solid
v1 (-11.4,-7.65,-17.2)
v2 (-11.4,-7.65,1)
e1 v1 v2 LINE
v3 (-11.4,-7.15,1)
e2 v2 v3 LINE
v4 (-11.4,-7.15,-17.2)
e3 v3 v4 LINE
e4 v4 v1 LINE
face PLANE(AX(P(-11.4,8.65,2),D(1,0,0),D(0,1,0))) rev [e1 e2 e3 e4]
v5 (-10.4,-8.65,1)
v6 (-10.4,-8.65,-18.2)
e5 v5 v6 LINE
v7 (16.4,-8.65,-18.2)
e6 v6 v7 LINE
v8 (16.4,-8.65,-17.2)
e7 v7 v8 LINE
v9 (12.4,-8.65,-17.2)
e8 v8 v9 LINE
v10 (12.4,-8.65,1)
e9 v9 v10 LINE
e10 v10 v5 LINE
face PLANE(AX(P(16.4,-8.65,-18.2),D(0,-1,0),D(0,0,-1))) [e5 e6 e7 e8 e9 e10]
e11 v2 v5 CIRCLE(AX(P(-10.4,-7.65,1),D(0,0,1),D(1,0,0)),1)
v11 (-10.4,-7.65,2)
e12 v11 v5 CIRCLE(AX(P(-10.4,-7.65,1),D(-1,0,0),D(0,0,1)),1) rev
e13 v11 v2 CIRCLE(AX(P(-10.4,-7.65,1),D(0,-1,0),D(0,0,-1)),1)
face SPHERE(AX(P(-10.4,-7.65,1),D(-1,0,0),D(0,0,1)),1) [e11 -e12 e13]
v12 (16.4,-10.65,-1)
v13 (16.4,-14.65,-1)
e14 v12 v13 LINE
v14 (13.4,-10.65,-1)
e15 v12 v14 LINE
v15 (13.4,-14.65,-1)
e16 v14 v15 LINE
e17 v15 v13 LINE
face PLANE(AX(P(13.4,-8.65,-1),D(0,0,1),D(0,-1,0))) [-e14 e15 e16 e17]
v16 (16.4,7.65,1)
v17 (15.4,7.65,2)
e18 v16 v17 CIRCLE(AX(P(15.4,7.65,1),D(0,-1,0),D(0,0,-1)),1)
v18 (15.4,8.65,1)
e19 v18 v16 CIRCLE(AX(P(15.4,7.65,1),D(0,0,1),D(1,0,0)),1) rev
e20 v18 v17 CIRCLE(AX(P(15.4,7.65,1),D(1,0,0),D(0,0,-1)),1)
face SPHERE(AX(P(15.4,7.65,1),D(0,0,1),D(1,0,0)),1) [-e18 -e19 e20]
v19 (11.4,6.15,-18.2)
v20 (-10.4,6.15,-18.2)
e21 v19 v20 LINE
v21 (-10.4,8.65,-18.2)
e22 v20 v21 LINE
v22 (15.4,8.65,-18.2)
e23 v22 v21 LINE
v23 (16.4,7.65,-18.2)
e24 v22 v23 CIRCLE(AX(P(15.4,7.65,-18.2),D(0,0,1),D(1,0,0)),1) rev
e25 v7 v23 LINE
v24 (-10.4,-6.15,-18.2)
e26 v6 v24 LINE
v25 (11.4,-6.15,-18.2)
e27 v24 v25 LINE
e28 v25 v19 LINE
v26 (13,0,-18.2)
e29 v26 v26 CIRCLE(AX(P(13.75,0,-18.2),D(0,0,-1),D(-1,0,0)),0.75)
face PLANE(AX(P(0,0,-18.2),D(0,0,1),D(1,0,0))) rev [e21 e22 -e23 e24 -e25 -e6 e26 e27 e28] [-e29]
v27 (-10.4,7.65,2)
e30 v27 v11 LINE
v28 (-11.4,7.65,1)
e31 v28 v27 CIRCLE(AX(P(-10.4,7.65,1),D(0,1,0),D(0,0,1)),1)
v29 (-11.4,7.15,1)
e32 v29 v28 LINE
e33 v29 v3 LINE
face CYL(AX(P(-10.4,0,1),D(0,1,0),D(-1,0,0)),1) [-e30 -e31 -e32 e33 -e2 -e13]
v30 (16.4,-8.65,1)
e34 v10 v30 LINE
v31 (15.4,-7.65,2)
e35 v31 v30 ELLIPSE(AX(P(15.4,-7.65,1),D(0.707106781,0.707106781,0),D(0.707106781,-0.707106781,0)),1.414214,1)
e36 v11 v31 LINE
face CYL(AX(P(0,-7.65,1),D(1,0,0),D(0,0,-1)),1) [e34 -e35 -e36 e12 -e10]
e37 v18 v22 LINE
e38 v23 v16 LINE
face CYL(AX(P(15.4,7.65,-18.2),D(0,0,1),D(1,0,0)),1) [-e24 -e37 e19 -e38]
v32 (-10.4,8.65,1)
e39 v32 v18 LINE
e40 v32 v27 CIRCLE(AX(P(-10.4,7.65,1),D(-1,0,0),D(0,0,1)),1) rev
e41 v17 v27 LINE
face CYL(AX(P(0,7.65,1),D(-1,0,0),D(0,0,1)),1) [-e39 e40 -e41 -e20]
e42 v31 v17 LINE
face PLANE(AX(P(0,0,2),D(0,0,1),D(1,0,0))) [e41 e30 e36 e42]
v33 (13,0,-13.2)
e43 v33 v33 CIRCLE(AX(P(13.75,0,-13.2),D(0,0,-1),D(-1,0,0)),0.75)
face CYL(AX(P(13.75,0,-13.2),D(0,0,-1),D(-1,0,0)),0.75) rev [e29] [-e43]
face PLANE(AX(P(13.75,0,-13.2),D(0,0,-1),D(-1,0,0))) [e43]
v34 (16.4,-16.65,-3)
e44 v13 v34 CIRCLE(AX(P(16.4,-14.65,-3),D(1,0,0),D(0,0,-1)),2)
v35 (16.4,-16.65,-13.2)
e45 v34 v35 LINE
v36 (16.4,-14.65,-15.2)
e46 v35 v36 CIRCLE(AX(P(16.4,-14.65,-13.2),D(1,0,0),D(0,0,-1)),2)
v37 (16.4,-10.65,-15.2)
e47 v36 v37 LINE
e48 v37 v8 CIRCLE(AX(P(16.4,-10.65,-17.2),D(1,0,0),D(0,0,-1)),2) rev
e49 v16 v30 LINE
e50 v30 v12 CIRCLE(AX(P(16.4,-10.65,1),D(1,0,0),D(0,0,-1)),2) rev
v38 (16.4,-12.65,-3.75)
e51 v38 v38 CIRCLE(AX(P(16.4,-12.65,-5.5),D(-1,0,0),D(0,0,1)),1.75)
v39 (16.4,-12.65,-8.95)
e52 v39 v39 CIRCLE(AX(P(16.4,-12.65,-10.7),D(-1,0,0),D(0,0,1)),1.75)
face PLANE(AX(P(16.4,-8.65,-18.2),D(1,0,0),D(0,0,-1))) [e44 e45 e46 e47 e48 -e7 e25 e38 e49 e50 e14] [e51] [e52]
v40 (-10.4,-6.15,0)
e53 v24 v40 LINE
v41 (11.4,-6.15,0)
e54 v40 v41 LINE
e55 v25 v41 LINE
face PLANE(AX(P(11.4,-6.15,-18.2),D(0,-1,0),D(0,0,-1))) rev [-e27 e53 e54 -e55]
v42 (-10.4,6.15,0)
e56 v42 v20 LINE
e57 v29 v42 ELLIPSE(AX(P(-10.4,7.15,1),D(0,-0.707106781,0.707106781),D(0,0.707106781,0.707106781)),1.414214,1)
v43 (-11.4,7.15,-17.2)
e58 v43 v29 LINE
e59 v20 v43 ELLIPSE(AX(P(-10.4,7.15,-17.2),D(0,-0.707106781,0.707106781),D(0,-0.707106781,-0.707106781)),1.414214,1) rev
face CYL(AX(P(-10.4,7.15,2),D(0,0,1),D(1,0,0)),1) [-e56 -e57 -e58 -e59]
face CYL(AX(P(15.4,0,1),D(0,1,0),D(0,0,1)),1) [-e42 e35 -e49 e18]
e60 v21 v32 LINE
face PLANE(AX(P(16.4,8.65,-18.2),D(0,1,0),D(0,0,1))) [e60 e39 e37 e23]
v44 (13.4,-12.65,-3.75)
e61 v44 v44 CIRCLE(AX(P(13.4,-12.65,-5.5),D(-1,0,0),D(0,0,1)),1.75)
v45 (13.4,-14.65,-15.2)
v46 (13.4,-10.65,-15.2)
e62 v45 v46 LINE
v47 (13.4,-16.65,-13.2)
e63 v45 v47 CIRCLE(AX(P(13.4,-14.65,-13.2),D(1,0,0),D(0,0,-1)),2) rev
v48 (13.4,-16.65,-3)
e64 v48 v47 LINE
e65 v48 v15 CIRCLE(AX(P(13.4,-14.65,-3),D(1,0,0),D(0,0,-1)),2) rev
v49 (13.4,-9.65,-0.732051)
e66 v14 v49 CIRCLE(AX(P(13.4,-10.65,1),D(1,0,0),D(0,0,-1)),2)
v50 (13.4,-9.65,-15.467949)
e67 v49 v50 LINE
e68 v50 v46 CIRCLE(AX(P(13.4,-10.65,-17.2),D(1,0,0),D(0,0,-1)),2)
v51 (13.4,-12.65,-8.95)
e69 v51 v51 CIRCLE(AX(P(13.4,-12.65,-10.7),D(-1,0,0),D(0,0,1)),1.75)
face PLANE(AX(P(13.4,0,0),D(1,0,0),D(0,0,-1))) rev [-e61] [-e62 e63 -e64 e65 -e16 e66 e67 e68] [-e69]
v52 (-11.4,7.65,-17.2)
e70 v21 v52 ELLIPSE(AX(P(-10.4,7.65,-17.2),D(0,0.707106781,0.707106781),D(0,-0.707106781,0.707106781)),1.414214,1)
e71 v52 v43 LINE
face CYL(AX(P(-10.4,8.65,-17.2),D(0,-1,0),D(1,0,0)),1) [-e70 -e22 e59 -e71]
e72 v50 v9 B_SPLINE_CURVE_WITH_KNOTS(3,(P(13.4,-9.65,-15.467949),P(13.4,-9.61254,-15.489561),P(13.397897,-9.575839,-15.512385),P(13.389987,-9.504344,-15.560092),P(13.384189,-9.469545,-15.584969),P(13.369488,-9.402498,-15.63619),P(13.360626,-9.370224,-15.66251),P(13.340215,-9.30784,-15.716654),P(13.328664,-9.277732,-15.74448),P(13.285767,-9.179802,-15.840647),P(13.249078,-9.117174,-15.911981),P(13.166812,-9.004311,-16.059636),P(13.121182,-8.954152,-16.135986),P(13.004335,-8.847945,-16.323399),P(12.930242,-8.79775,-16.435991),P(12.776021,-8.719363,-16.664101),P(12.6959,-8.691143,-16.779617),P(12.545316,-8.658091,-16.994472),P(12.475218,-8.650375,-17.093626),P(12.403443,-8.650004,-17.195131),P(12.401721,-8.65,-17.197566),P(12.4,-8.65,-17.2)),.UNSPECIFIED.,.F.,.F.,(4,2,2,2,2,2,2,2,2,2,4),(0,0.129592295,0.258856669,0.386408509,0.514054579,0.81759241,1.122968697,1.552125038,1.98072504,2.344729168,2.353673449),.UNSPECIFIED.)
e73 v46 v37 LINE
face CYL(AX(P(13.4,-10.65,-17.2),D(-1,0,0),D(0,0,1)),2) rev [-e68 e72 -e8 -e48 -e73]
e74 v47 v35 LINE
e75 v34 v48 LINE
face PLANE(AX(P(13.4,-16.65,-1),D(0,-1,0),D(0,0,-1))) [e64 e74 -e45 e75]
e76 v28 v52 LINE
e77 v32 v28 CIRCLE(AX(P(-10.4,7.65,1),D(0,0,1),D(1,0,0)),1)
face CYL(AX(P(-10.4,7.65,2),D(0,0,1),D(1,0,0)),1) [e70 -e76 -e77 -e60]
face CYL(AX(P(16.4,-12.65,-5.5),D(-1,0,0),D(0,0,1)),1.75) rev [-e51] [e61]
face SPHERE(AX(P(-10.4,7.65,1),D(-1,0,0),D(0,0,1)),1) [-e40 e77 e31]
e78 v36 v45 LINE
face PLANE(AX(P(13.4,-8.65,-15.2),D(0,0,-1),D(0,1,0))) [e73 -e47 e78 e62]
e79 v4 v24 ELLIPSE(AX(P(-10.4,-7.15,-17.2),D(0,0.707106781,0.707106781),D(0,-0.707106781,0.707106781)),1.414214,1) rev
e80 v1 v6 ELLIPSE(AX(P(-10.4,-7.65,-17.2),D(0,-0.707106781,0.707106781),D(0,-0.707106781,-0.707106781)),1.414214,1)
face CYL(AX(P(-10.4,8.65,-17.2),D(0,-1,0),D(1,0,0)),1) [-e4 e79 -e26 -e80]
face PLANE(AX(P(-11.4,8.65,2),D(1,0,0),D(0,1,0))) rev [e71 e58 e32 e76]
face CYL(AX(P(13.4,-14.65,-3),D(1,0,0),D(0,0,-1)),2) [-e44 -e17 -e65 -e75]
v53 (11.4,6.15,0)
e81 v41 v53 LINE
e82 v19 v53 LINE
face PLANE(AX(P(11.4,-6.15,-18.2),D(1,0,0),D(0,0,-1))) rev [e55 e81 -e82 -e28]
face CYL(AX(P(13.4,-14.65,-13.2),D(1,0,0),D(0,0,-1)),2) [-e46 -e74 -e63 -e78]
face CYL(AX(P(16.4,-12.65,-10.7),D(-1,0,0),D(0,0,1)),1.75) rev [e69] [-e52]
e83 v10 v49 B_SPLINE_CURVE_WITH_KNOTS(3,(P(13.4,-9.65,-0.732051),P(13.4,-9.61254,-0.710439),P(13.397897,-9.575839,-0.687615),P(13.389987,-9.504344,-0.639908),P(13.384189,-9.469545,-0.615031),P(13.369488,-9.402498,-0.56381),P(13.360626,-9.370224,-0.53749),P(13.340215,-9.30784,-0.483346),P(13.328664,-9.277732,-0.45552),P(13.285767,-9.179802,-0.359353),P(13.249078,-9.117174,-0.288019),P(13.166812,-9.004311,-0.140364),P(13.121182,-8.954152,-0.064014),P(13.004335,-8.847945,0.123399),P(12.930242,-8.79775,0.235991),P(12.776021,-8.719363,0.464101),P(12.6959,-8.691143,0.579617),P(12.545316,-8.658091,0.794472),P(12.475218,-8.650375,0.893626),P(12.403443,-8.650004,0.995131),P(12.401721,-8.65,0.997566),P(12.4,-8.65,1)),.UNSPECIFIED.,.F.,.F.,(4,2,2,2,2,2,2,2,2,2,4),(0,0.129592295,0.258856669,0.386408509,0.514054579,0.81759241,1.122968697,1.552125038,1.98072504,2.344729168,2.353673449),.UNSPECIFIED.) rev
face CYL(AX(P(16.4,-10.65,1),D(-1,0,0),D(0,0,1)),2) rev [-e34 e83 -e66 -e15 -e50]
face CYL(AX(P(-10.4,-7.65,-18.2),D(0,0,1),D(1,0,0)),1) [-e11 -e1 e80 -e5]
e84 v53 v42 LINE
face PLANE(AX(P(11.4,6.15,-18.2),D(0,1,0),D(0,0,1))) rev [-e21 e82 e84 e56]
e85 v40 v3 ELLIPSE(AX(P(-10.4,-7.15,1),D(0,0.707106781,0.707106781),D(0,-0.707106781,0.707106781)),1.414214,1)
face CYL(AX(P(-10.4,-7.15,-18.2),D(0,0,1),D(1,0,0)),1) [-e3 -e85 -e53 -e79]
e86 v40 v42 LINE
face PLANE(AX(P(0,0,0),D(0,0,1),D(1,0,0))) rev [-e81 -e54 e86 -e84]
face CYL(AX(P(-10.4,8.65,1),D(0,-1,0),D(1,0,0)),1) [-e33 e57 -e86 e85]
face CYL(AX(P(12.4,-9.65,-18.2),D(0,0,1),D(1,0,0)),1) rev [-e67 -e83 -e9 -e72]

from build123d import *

# Parameters (mm, degrees)
SKETCH1_W           = 22.8
SKETCH1_H           = 12.3
BOSS_EXTRUDE1_DEPTH = 2
SKETCH2_W           = 32.8
SKETCH2_H           = 17.3
SKETCH2_W_2         = 22.8
SKETCH2_H_2         = 12.3
BOSS_EXTRUDE2_DEPTH = 20.2
SKETCH3_W           = 15.2
SKETCH3_H           = 11.3
CUT_EXTRUDE1_DEPTH  = 5
FILLET1_R           = 1
SKETCH4_R           = 0.75
CUT_EXTRUDE2_DEPTH  = 5
SKETCH5_W           = 3.5
SKETCH5_H           = 17.3
CUT_EXTRUDE3_DEPTH  = 28.419381831
FILLET2_R           = 1
SKETCH8_W           = 14.2
SKETCH8_H           = 8
BOSS_EXTRUDE4_DEPTH = 3
SKETCH9_R           = 1.75
CUT_EXTRUDE5_DEPTH  = 37.057627487
FILLET4_R           = 2
SKETCH10_W          = 2.29579642
SKETCH10_H          = 17.3
CUT_EXTRUDE6_DEPTH  = 31.890492065
FILLET5_R           = 1
FILLET6_R           = 1


with BuildPart() as part:
    # Sketch1 → Boss-Extrude1 (new body)
    with BuildSketch(Plane.XY):
        Rectangle(SKETCH1_W, SKETCH1_H)
    extrude(amount=BOSS_EXTRUDE1_DEPTH)

    # Sketch2 → Boss-Extrude2 (add)
    with BuildSketch(Plane.XY.offset(2)):
        Rectangle(SKETCH2_W, SKETCH2_H)
        Rectangle(SKETCH2_W_2, SKETCH2_H_2, mode=Mode.SUBTRACT)
    extrude(amount=-BOSS_EXTRUDE2_DEPTH)

    # Sketch3 → Cut-Extrude1 (cut)
    with BuildSketch(Plane.ZY.offset(16.4)):
        with Locations((-10.6, 0)):
            Rectangle(SKETCH3_W, SKETCH3_H)
    extrude(amount=-CUT_EXTRUDE1_DEPTH, mode=Mode.SUBTRACT)

    # Fillet1
    fillet1_edges = [part.edges().sort_by_distance(p)[0] for p in [
        (-13.9, 5.65, -3),
        (-13.9, -5.65, -3),
    ]]
    fillet(fillet1_edges, radius=FILLET1_R)

    # Sketch4 → Cut-Extrude2 (cut)
    with BuildSketch(Plane(origin=(0, 0, -18.2), x_dir=(-1, 0, 0), z_dir=(0, 0, -1))):
        with Locations((-13.75, 0)):
            Circle(SKETCH4_R)
    extrude(amount=-CUT_EXTRUDE2_DEPTH, mode=Mode.SUBTRACT)

    # Sketch5 → Cut-Extrude3 (cut, through all)
    with BuildSketch(Plane(origin=(0, 0, -18.2), x_dir=(-1, 0, 0), z_dir=(0, 0, -1))):
        with Locations((14.65, 0)):
            Rectangle(SKETCH5_W, SKETCH5_H)
    extrude(amount=-CUT_EXTRUDE3_DEPTH, mode=Mode.SUBTRACT)

    # Fillet2
    fillet2_edges = [part.edges().sort_by_distance(p)[0] for p in [
        (16.4, 8.65, -8.1),
        (-12.9, 5.357106781, -3.292893219),
        (-12.9, -7.15, -18.2),
        (-12.9, 7.15, -18.2),
        (-12.9, -5.65, -11.1),
        (-12.9, -5.357106781, -3.292893219),
        (-12.9, 0, -3),
        (-12.9, 5.65, -11.1),
        (-12.9, 0, 2),
        (-12.9, -8.65, -8.1),
        (-12.9, 8.65, -8.1),
    ]]
    fillet(fillet2_edges, radius=FILLET2_R)

    # Sketch8 → Boss-Extrude4 (add)
    with BuildSketch(Plane(origin=(16.4, 0, 0), x_dir=(0, 0, -1), z_dir=(1, 0, 0))):
        with Locations((8.1, -12.65)):
            Rectangle(SKETCH8_W, SKETCH8_H)
    extrude(amount=-BOSS_EXTRUDE4_DEPTH)

    # Sketch9 → Cut-Extrude5 (cut, through all)
    with BuildSketch(Plane.ZY.offset(-13.4)):
        with Locations((-10.7, -12.65)):
            Circle(SKETCH9_R)
        with Locations((-5.5, -12.65)):
            Circle(SKETCH9_R)
    extrude(amount=-CUT_EXTRUDE5_DEPTH, mode=Mode.SUBTRACT)

    # Fillet4
    fillet4_edges = [part.edges().sort_by_distance(p)[0] for p in [
        (14.9, -16.65, -1),
        (14.9, -8.65, -1),
        (14.9, -8.65, -15.2),
        (14.9, -16.65, -15.2),
    ]]
    fillet(fillet4_edges, radius=FILLET4_R)

    # Sketch10 → Cut-Extrude6 (cut, through all)
    with BuildSketch(Plane(origin=(0, 0, -18.2), x_dir=(-1, 0, 0), z_dir=(0, 0, -1))):
        with Locations((12.54789821, 0)):
            Rectangle(SKETCH10_W, SKETCH10_H)
    extrude(amount=-CUT_EXTRUDE6_DEPTH, mode=Mode.SUBTRACT)

    # Fillet5
    fillet5_edges = [part.edges().sort_by_distance(p)[0] for p in [
        (16.4, -0.5, 2),
        (16.107106781, 8.357106781, 2),
        (-11.4, 6.15, -9.1),
        (-11.4, 7.4, -18.2),
        (-11.4, 8.65, -8.1),
        (-11.4, 0, 2),
        (-11.4, -8.65, -8.1),
        (-11.4, -7.4, -18.2),
        (-11.4, -6.15, -9.1),
        (-11.4, 0, 0),
        (2.5, -8.65, 2),
        (2, 8.65, 2),
    ]]
    fillet(fillet5_edges, radius=FILLET5_R - 0.0001)  # a hair under: the kernel refuses the full size

    # Fillet6
    fillet6_edges = [part.edges().sort_by_distance(p)[0] for p in [
        (13.4, -8.65, -8.1),
    ]]
    fillet(fillet6_edges, radius=FILLET6_R)


solid = part.part
